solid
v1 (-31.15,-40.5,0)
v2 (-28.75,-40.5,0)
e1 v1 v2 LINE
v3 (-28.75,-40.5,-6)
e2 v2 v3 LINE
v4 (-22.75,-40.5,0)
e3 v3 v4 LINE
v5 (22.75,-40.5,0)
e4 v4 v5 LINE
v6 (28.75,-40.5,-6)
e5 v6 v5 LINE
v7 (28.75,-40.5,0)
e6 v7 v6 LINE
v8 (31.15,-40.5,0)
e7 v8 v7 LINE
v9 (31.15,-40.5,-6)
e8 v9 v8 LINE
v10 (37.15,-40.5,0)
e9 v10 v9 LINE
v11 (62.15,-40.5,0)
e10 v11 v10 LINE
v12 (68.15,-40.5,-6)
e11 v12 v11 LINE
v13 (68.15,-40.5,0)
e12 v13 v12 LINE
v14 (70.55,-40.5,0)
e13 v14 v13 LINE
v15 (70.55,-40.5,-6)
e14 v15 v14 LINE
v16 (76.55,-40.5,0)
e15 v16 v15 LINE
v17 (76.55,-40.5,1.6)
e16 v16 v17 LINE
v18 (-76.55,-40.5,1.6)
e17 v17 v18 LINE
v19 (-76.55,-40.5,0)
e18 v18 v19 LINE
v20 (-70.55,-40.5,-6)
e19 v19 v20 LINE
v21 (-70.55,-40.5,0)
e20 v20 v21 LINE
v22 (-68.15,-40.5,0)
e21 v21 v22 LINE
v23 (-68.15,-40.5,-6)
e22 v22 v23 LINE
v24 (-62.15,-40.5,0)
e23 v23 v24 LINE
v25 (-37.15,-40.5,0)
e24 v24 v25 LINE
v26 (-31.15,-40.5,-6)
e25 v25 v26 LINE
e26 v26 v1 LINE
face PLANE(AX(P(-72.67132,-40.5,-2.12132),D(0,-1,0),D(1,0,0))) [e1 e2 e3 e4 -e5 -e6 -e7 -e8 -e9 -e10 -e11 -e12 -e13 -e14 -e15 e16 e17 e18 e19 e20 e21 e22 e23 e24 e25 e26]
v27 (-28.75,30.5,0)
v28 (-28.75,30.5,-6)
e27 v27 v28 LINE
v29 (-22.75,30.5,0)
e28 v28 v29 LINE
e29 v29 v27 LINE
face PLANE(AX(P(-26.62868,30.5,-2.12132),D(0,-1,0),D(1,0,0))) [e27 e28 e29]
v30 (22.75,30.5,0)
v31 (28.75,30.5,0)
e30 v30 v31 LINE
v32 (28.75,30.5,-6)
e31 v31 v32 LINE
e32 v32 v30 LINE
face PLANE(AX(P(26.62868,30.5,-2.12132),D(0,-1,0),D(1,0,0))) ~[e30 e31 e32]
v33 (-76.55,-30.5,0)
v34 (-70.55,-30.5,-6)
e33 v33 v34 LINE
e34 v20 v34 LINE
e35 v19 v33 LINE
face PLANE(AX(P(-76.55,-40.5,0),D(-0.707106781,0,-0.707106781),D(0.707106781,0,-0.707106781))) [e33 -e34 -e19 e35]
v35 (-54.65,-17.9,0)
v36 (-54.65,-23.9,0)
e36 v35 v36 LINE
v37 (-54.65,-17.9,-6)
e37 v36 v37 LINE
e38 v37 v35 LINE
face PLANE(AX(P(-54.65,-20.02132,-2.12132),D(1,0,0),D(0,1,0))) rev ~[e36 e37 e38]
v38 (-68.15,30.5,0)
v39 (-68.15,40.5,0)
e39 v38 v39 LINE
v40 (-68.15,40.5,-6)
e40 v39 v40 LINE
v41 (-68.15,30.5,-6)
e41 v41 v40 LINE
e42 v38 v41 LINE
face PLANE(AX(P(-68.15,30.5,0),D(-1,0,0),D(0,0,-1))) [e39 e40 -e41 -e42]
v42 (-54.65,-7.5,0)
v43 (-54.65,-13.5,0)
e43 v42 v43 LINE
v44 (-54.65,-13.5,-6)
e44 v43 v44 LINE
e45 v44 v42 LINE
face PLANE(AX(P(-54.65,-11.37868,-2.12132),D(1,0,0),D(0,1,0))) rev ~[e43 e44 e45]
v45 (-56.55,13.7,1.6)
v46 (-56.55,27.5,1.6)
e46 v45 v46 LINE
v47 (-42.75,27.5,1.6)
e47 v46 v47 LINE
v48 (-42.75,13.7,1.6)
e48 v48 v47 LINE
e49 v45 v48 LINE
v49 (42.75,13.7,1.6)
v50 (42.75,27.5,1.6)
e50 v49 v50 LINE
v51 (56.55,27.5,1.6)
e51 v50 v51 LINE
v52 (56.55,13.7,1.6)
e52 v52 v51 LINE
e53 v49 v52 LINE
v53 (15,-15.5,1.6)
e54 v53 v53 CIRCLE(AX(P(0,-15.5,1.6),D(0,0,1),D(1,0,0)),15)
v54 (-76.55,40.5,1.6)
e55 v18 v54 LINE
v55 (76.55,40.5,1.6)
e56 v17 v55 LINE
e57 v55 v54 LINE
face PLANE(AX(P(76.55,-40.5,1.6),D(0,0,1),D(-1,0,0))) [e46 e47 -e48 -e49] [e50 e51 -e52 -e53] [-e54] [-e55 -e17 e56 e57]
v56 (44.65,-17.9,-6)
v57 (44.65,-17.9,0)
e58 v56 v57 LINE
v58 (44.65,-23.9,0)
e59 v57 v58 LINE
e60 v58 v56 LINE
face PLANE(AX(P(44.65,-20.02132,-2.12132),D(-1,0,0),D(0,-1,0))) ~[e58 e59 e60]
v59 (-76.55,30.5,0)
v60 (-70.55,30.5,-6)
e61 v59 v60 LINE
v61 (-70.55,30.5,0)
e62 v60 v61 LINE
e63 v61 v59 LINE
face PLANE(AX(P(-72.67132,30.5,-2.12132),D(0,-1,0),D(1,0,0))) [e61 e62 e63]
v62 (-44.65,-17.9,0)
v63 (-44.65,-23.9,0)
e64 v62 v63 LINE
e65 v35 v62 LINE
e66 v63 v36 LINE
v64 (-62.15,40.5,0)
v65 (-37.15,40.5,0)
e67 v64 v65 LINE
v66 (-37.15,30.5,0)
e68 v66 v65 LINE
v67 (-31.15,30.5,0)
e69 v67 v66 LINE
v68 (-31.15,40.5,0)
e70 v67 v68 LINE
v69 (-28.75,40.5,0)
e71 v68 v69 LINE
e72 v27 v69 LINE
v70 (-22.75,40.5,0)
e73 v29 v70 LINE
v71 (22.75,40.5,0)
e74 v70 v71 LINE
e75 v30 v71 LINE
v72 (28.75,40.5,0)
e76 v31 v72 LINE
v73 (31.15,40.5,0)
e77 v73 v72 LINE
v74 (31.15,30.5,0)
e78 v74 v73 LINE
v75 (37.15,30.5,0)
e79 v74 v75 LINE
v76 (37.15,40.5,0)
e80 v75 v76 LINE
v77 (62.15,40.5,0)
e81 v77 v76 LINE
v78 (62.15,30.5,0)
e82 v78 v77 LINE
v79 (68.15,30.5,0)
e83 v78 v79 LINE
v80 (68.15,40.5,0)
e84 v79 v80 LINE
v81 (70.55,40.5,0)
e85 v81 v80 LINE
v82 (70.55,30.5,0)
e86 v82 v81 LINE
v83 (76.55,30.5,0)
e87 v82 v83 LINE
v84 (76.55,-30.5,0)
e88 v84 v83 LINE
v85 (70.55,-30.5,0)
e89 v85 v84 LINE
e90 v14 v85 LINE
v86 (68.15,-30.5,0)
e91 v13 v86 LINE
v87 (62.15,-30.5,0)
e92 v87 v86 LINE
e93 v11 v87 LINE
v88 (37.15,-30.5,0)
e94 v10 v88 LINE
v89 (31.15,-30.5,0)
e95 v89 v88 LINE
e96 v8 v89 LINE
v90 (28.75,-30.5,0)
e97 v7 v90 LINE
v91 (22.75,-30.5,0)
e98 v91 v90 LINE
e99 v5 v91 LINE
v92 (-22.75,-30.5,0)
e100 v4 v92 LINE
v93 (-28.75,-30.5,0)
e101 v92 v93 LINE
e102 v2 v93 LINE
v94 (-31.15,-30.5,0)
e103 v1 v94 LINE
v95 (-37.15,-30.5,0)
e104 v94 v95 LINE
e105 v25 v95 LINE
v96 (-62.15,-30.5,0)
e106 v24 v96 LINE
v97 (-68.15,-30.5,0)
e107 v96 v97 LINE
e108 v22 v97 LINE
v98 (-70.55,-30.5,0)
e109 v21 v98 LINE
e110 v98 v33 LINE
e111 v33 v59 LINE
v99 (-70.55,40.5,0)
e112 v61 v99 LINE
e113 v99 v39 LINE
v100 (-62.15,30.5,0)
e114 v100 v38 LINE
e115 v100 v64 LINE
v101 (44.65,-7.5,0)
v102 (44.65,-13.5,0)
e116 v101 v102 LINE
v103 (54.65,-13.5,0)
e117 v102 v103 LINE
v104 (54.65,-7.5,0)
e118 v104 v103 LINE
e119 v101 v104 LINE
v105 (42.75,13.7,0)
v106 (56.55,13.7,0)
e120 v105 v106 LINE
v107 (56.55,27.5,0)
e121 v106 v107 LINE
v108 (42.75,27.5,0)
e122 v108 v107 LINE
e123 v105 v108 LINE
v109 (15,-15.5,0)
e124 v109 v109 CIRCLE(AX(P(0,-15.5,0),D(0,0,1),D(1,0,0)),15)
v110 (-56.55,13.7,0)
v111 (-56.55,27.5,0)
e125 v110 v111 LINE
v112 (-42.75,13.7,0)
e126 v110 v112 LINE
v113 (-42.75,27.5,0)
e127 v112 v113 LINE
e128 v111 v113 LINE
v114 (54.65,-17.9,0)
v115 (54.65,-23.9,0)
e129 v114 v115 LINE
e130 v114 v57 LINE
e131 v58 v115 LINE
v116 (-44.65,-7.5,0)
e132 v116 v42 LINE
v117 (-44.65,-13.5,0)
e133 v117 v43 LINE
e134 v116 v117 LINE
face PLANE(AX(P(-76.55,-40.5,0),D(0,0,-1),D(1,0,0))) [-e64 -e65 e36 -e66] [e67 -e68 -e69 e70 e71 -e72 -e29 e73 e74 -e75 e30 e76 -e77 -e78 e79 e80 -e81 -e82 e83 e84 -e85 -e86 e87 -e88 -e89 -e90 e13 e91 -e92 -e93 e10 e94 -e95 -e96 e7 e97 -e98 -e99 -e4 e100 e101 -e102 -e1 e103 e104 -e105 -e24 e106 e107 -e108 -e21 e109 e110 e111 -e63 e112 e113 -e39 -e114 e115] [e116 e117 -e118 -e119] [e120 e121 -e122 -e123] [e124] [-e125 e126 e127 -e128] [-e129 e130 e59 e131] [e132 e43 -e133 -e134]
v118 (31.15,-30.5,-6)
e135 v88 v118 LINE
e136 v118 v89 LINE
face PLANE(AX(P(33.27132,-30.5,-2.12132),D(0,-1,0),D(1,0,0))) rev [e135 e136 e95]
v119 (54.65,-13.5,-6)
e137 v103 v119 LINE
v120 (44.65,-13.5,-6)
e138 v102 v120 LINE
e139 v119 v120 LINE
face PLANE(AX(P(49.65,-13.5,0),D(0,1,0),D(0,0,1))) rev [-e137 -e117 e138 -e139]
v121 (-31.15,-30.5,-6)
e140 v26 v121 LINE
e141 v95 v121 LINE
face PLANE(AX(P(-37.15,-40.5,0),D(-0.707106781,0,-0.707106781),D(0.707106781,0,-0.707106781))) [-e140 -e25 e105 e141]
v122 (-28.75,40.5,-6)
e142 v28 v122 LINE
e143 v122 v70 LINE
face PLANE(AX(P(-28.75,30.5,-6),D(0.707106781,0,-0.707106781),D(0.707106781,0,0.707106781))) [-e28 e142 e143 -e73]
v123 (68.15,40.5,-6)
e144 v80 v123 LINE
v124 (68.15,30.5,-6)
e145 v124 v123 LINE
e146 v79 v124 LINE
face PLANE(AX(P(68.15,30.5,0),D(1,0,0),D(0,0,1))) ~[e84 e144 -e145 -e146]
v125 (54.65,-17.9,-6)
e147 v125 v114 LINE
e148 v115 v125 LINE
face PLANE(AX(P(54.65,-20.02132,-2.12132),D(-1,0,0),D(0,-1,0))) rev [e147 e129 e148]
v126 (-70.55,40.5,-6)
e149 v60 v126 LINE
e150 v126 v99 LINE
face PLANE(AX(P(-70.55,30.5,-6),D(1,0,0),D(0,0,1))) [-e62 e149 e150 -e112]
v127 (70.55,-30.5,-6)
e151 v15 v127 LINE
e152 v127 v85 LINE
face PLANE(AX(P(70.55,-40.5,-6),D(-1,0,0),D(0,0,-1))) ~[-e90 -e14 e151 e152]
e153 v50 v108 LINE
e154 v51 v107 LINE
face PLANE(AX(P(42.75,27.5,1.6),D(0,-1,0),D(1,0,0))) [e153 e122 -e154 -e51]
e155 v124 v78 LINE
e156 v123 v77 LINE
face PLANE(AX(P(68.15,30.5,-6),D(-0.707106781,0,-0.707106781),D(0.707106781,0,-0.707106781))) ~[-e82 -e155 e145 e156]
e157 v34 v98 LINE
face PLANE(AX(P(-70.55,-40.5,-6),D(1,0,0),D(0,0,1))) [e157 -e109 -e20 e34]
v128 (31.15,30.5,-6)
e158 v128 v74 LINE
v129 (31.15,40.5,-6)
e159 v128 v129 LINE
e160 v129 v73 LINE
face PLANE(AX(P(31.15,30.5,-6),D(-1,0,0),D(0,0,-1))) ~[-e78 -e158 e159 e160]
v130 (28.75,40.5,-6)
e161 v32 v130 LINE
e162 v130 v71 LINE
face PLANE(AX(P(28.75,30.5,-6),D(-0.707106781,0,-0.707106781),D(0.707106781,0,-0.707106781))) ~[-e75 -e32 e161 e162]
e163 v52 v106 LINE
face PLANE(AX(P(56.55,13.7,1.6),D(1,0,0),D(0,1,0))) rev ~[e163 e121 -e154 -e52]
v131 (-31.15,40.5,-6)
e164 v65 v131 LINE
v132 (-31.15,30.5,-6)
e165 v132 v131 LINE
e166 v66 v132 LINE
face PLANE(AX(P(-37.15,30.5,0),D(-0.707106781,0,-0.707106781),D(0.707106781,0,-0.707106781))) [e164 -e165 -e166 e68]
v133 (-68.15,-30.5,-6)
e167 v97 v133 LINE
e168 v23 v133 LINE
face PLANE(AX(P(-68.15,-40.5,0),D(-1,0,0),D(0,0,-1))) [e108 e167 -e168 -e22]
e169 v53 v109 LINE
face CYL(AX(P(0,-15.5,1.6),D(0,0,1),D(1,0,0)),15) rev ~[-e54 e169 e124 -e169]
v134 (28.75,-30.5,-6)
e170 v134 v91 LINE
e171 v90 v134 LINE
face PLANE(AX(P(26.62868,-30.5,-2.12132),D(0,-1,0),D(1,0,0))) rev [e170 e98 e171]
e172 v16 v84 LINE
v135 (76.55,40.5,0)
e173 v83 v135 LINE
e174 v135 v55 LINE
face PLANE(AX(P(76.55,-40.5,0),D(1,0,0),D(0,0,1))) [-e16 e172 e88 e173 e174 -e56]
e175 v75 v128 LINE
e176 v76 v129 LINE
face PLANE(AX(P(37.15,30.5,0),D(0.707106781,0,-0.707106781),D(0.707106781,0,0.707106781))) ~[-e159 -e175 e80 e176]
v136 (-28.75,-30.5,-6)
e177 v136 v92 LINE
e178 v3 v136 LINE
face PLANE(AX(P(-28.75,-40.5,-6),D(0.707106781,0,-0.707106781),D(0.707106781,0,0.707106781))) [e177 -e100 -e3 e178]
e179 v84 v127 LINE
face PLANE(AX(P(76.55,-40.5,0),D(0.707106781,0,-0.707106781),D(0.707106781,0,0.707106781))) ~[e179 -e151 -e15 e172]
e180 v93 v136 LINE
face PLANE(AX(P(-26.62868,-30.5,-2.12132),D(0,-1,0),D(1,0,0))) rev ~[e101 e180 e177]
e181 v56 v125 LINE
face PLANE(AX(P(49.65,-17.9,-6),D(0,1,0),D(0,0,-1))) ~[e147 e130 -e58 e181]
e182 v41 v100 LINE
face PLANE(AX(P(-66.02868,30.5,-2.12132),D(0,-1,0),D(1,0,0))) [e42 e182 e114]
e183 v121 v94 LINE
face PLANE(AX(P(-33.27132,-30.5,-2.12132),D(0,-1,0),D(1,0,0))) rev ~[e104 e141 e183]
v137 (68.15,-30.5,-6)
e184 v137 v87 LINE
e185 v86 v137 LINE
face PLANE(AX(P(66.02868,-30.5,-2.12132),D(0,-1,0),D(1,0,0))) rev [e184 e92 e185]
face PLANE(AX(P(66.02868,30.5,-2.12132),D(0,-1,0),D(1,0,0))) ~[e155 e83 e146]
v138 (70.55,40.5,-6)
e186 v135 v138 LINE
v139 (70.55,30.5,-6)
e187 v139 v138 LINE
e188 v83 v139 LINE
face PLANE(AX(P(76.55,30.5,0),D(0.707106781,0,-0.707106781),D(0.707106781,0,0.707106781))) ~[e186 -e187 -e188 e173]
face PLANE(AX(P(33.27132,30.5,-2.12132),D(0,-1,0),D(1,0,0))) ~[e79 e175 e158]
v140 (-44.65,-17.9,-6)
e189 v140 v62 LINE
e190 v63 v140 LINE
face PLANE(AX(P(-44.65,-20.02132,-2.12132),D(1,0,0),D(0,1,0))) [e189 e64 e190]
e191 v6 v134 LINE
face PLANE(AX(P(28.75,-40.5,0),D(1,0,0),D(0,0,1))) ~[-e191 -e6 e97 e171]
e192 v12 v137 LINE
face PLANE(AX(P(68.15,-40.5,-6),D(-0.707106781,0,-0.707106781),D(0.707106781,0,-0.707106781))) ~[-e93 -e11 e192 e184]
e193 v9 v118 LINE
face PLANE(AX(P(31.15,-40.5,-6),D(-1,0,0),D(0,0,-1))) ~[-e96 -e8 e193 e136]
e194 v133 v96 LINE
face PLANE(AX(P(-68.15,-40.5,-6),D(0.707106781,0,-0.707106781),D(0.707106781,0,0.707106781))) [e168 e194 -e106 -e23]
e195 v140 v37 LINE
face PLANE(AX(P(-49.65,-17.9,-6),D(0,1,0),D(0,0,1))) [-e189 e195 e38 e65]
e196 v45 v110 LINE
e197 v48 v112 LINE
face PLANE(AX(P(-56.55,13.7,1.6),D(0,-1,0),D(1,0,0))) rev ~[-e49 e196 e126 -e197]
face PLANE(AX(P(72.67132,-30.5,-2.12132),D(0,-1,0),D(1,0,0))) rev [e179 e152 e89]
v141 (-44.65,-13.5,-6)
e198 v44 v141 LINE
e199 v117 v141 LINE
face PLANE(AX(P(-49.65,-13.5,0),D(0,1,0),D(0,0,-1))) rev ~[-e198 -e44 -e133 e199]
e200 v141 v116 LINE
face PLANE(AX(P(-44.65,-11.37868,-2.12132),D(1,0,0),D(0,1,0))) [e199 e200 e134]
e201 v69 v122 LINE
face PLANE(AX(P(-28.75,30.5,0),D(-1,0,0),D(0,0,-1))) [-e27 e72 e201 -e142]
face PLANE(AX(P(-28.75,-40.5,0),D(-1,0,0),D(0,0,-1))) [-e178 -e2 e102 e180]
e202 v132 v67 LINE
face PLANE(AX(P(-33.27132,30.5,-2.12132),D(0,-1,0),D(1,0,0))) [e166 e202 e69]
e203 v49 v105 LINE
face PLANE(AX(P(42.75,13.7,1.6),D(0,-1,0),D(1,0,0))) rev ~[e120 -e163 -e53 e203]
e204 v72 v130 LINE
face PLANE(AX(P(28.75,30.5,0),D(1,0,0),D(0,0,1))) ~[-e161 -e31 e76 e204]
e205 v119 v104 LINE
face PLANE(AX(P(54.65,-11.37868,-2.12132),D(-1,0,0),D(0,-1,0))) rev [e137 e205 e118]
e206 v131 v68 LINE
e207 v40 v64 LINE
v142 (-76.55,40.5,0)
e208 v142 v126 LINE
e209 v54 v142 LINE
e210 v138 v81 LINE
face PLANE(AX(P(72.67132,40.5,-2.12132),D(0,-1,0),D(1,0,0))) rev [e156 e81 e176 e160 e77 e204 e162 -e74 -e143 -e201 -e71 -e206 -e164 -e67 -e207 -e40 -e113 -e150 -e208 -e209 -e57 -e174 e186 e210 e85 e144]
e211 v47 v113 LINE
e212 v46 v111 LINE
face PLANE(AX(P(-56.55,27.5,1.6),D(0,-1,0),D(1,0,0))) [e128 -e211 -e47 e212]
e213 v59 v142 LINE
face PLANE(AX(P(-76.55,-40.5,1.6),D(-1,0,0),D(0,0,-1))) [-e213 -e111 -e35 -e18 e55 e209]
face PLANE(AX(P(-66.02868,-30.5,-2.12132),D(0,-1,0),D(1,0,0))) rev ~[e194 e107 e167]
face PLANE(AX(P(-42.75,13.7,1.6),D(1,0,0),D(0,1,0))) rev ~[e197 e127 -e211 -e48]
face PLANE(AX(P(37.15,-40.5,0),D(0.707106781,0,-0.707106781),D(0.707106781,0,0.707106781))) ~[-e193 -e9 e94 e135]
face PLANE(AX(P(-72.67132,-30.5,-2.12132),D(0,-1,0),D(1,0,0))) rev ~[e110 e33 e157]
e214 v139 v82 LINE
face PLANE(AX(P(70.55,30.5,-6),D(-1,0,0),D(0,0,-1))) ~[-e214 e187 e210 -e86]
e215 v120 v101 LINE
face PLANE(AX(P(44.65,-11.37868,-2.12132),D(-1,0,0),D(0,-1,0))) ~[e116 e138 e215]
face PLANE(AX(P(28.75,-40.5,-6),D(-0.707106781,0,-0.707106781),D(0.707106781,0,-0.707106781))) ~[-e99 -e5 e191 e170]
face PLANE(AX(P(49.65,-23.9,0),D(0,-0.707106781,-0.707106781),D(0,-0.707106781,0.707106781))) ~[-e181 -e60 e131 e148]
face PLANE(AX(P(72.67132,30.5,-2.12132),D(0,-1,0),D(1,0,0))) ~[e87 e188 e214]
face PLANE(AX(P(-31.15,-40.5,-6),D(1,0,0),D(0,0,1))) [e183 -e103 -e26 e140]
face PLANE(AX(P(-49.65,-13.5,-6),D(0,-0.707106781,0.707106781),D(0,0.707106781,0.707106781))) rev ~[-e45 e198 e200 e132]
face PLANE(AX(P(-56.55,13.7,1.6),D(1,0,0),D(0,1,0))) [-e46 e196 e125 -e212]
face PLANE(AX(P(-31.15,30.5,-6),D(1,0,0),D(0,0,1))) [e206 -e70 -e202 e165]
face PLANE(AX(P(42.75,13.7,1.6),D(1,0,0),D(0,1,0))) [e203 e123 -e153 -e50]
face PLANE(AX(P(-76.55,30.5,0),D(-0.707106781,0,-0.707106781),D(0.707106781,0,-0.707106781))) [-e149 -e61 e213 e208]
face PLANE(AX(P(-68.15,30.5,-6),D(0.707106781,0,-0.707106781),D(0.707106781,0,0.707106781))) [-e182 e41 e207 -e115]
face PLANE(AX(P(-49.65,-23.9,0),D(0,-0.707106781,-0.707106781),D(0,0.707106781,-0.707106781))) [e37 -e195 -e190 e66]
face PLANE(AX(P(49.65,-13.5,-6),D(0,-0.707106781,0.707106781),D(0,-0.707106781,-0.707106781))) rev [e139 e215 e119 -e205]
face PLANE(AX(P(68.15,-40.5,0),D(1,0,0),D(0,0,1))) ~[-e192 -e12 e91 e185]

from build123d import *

# Parameters (mm, degrees)
F2_DEPTH  = 81
F3_DEPTH  = 10
F4_START  = -71
F4_DEPTH  = 10
F7_DEPTH  = 5
F9_R      = 15
F10_DEPTH = 1.6
F11_W     = 13.8
F11_H     = 13.8
F12_DEPTH = 1.6


# Not quite as in the source:
# - a feature names something its author has since deleted; it is built from what else it names


with BuildPart() as f2:
    # F1 (on offset) → F2 (new body)
    with BuildSketch(Plane.XZ.offset(40.5)):
        Polygon((76.55, 0), (76.55, 1.6), (-76.55, 1.6), (-76.55, 0), (-70.55, 0), (-68.15, 0), (-62.15, 0), (-37.15, 0), (-31.15, 0), (-28.75, 0), (-22.75, 0), (22.75, 0), (28.75, 0), (31.15, 0), (37.15, 0), (62.15, 0), (68.15, 0), (70.55, 0), align=None)
    extrude(amount=-F2_DEPTH)

    # F1 (on offset) → F3 (join)
    with BuildSketch(Plane.XZ.offset(40.5)):
        Polygon((-62.15, 0), (-68.15, 0), (-68.15, -6), align=None)
        Polygon((-31.15, 0), (-37.15, 0), (-31.15, -6), align=None)
        Polygon((-22.75, 0), (-28.75, 0), (-28.75, -6), align=None)
        Polygon((-70.55, 0), (-76.55, 0), (-70.55, -6), align=None)
    extrude(amount=-F3_DEPTH)

    # F1 (on offset) → F4 (join)
    with BuildSketch(Plane.XZ.offset(40.5).offset(F4_START)):
        Polygon((-62.15, 0), (-68.15, 0), (-68.15, -6), align=None)
        Polygon((-31.15, 0), (-37.15, 0), (-31.15, -6), align=None)
        Polygon((-22.75, 0), (-28.75, 0), (-28.75, -6), align=None)
        Polygon((-70.55, 0), (-76.55, 0), (-70.55, -6), align=None)
    extrude(amount=-F4_DEPTH)

    # F6 (on offset) → F7 (join, symmetric)
    with BuildSketch(Plane.YZ.offset(-49.65)):
        Polygon((-13.5, 0), (-13.5, -6), (-7.5, 0), align=None)
        Polygon((-17.9, -6), (-17.9, 0), (-23.9, 0), align=None)
    extrude(amount=F7_DEPTH, both=True)

    # F8: F2 across plane


with BuildPart() as f2_1:
    add(f2.part)
    add(f2.part.mirror(Plane.YZ))

    # F9 (on face) → F10 (cut)
    with BuildSketch(Plane.XY.offset(1.6)):
        with Locations((0, -15.5)):
            Circle(F9_R)
    extrude(amount=-F10_DEPTH, mode=Mode.SUBTRACT)

    # F11 (on face) → F12 (cut)
    with BuildSketch(Plane.XY.offset(1.6)):
        with Locations((-49.65, 20.6)):
            Rectangle(F11_W, F11_H)
        with Locations((49.65, 20.6)):
            Rectangle(F11_W, F11_H)
    extrude(amount=-F12_DEPTH, mode=Mode.SUBTRACT)


solid = f2_1.part
